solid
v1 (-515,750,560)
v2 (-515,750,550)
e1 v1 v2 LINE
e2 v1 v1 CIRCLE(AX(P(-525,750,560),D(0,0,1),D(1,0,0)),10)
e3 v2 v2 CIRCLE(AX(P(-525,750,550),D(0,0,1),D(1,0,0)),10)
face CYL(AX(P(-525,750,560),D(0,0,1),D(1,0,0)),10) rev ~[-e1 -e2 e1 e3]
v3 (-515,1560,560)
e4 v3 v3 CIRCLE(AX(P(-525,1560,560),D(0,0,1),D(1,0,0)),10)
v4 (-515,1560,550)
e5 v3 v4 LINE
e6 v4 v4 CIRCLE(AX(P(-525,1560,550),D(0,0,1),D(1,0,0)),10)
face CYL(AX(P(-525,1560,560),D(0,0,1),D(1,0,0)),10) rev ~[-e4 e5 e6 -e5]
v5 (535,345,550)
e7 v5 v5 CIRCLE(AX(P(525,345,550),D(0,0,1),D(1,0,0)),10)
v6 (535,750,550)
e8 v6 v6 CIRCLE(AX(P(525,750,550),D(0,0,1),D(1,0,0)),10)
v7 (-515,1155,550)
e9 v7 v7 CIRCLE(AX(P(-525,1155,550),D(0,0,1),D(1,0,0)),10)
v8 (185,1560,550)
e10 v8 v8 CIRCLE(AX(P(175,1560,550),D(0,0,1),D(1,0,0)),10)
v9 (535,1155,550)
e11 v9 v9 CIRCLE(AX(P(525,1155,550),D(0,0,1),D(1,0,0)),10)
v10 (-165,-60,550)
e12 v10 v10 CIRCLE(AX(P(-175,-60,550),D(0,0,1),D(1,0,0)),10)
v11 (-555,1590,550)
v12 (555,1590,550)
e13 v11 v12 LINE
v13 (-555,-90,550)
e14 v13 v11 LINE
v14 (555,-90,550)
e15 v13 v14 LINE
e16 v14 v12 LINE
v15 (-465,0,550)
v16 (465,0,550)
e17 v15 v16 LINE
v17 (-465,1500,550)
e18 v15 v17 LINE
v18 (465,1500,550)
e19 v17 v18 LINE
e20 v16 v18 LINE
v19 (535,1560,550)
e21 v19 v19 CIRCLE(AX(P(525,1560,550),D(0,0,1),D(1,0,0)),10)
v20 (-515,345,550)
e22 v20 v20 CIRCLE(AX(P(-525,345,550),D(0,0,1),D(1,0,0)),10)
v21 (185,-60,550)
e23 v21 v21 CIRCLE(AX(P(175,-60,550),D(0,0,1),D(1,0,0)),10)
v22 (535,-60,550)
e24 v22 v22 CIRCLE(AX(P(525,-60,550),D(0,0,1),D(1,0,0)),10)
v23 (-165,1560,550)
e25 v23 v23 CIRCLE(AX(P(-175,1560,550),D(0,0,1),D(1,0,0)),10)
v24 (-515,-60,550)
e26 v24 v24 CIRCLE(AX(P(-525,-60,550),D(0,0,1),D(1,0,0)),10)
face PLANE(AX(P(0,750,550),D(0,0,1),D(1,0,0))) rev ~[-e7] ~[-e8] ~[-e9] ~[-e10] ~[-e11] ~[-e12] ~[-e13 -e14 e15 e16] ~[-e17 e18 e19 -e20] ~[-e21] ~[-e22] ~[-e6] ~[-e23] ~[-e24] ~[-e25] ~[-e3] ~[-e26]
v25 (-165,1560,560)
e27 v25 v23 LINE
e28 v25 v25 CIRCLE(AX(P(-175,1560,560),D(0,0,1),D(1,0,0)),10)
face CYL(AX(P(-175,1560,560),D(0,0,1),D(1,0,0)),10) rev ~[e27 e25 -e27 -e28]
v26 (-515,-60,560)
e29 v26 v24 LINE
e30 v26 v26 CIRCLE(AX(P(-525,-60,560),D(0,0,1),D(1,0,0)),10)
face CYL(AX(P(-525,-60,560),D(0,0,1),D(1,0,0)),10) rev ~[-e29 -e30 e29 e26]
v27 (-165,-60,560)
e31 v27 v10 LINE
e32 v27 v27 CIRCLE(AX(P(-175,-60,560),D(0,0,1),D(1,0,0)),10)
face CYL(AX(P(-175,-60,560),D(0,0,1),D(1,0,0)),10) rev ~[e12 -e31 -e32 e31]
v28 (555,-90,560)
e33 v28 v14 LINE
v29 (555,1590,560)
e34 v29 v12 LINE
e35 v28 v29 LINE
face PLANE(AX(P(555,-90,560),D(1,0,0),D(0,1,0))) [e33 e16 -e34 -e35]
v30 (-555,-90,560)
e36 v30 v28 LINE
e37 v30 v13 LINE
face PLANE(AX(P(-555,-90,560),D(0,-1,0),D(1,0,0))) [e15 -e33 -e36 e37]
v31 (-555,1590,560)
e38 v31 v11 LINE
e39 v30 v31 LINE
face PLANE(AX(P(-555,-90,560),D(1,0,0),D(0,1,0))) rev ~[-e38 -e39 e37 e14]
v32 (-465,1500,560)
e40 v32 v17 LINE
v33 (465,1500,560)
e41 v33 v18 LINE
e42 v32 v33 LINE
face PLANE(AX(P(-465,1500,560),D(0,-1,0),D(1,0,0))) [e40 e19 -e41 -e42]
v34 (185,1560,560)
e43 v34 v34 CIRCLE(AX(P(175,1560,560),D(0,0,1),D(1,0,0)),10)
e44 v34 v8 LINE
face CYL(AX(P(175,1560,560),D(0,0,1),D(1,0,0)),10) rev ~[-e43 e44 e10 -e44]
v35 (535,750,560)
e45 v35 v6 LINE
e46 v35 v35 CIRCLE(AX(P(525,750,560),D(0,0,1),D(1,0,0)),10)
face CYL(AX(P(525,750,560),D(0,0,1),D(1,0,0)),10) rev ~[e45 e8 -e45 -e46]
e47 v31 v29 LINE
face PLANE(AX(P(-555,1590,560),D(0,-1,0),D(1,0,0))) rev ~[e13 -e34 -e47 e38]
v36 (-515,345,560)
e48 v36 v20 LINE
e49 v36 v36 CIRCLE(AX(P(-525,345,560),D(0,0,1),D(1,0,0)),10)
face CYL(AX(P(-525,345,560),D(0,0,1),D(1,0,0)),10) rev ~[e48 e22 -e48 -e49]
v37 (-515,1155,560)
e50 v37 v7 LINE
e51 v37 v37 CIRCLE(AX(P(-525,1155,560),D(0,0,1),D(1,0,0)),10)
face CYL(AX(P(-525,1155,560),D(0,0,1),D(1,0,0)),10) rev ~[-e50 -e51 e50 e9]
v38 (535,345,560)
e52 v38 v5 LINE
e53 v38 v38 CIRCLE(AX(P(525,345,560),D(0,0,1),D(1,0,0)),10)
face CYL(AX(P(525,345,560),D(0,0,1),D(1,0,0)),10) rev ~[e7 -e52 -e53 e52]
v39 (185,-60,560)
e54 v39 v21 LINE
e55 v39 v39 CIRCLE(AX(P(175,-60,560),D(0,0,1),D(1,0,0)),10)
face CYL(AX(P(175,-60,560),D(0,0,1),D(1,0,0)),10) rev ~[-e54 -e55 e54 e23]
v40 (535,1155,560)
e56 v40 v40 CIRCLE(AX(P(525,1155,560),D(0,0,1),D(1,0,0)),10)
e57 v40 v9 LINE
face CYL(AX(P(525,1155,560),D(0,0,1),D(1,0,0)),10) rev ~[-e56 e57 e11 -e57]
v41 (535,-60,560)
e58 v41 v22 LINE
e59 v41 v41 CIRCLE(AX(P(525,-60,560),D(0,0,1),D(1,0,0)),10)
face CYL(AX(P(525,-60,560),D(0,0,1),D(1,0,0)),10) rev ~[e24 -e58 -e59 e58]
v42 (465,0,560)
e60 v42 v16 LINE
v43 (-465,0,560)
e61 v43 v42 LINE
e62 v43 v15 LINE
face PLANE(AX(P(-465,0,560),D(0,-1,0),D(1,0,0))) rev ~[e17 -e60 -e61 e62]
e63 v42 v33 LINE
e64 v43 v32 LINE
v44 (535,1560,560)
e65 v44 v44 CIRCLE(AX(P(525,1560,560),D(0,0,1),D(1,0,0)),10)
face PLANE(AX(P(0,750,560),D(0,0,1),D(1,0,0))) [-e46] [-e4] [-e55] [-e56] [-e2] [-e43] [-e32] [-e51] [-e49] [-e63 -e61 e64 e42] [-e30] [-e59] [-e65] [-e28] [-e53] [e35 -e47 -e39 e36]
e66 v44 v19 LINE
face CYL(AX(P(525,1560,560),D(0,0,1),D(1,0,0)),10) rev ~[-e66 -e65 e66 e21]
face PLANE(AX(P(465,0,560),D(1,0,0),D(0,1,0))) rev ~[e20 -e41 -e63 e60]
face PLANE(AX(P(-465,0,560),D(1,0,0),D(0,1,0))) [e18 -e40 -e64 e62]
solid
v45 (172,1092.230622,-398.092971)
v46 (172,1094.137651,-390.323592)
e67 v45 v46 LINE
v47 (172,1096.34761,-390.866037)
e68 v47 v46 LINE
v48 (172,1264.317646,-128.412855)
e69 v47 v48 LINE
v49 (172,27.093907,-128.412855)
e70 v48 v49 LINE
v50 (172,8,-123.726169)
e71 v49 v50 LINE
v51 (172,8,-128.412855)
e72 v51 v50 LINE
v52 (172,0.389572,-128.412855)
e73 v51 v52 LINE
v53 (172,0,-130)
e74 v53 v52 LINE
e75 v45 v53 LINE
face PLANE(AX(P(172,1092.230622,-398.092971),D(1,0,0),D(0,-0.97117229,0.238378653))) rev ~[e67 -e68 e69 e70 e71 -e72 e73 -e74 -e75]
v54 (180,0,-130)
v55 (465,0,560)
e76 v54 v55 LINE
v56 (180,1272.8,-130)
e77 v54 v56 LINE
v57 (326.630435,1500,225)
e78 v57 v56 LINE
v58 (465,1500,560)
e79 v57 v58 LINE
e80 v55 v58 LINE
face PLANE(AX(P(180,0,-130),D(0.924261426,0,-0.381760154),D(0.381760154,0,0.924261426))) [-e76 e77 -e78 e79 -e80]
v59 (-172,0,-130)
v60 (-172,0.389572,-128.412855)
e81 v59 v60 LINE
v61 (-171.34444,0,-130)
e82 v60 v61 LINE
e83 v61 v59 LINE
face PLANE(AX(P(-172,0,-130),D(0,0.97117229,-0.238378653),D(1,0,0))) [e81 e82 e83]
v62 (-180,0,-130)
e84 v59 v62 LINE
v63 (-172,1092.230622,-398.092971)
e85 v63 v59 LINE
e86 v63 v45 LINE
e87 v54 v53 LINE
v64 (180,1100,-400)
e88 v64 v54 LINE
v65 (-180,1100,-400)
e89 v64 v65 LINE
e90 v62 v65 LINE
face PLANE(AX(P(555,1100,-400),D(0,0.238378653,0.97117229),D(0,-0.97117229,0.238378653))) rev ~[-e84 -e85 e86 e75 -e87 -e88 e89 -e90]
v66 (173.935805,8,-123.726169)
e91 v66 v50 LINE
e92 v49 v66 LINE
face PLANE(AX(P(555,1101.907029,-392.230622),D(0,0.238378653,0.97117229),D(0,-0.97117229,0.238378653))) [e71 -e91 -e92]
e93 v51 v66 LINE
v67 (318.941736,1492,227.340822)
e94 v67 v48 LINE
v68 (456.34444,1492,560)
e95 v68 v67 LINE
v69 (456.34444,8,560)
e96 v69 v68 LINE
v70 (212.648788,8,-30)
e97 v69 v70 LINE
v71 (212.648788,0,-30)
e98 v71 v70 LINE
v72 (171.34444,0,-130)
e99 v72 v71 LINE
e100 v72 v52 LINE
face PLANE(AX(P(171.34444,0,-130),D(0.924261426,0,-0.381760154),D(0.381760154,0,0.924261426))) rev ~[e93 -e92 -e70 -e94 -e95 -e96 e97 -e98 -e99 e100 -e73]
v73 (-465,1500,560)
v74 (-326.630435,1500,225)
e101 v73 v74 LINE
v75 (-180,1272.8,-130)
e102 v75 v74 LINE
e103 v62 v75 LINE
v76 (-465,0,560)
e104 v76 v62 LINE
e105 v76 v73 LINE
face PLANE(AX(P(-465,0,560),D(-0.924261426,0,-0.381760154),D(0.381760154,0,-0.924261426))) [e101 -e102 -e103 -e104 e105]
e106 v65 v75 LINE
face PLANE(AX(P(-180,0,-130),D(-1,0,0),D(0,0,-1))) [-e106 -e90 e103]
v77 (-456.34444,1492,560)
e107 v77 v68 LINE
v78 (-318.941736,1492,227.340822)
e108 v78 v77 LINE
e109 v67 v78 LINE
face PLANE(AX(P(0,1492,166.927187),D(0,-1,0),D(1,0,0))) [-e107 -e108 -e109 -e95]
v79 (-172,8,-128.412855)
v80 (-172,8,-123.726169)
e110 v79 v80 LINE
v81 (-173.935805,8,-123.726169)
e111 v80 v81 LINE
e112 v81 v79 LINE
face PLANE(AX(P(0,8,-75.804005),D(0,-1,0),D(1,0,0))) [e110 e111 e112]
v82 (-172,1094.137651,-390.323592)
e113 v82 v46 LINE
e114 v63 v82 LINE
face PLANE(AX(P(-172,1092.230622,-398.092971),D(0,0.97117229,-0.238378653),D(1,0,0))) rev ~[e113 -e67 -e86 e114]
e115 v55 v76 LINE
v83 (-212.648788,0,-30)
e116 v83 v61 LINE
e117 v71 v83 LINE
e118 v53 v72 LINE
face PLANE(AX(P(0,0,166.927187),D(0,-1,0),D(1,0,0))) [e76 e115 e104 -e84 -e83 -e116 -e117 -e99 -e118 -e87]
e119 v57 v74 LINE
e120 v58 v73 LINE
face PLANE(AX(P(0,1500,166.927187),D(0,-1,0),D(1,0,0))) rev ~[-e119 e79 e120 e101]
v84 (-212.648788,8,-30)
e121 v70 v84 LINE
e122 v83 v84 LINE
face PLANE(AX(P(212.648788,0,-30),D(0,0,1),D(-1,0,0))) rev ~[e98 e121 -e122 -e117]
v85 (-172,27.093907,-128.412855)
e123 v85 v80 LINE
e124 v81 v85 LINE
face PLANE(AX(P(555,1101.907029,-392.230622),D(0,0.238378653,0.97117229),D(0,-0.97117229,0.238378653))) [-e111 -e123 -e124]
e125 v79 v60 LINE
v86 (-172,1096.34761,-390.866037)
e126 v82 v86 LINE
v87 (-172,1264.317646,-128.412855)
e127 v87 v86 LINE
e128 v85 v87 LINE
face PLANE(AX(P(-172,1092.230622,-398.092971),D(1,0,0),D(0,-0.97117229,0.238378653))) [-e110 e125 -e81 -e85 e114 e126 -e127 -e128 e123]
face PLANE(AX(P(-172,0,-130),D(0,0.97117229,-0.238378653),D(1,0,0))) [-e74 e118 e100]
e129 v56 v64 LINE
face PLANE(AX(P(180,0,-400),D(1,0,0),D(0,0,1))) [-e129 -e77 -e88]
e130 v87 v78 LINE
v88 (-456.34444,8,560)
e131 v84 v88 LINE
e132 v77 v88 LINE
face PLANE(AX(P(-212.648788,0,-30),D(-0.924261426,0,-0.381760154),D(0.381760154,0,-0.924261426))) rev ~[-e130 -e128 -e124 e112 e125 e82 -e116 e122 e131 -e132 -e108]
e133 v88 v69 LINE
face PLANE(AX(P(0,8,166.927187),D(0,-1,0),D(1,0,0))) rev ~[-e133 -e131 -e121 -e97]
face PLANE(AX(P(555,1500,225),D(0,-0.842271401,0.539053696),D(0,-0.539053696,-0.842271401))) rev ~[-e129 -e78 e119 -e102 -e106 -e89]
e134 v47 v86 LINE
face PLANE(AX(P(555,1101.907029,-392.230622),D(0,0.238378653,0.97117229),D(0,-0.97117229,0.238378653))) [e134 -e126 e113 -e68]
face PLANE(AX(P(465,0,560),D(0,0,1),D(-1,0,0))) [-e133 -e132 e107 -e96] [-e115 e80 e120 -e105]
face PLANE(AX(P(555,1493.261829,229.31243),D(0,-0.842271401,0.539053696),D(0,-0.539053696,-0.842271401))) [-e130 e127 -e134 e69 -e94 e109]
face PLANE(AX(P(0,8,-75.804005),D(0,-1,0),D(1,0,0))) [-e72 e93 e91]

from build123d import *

# Parameters (mm, degrees)
F1_DEPTH  = 1500
F2_W      = 1110
F2_H      = 1680
F2_W_2    = 930
F2_H_2    = 1500
F3_DEPTH  = 10
F4_R      = 10
F5_DEPTH  = 10
F7_DEPTH  = 1110.001
F8_T      = -8
F10_DEPTH = 8
F11_W     = 344
F11_H     = 1124.6517558367
F12_DEPTH = 8


with BuildPart() as f1:
    # F0 (on Front) → F1 (new body)
    with BuildSketch(Plane.XZ):
        Polygon((465, 560), (-465, 560), (-180, -130), (-180, -400), (180, -400), (180, -130), align=None)
    extrude(amount=-F1_DEPTH)

    # F6 (on face) → F7 (cut, through all)
    with BuildSketch(Plane.YZ.offset(555)):
        Polygon((0, -400), (1100, -400), (0, -130), align=None)
        Polygon((1500, 225), (1100, -400), (1500, -400), align=None)
    extrude(amount=-F7_DEPTH, mode=Mode.SUBTRACT)

    # F8
    f8_openings = [f1.faces().sort_by_distance(p)[0] for p in [
        (0, 750, 560),
    ]]
    offset(amount=F8_T, openings=f8_openings, kind=Kind.INTERSECTION)

    # F9 (on Front) → F10 (cut)
    with BuildSketch(Plane.XZ):
        Polygon((212.6487880778, -30), (-212.6487880778, -30), (-171.3444402517, -130), (171.3444402517, -130), align=None)
    extrude(amount=-F10_DEPTH, mode=Mode.SUBTRACT)

    # F11 (on face) → F12 (cut)
    with BuildSketch(Plane(origin=(0, -30.0958765297, -122.6128303063), x_dir=(1, 0, 0), z_dir=(0, -0.2383786531, -0.9711722905))):
        with Locations((0, -593.3151028228)):
            Rectangle(F11_W, F11_H)
    extrude(amount=-F12_DEPTH, mode=Mode.SUBTRACT)


with BuildPart() as f3:
    # F2 (on face) → F3 (new body)
    with BuildSketch(Plane.XY.offset(560)):
        with Locations((0, 750)):
            Rectangle(F2_W, F2_H)
        with Locations((0, 750)):
            Rectangle(F2_W_2, F2_H_2, mode=Mode.SUBTRACT)
    extrude(amount=-F3_DEPTH)

    # F4 (on face) → F5 (cut)
    with BuildSketch(Plane.XY.offset(560)):
        with Locations((-525, 1560)):
            Circle(F4_R)
        with Locations((-175, 1560)):
            Circle(F4_R)
        with Locations((175, 1560)):
            Circle(F4_R)
        with Locations((525, 1560)):
            Circle(F4_R)
        with Locations((525, 1155)):
            Circle(F4_R)
        with Locations((525, 750)):
            Circle(F4_R)
        with Locations((525, 345)):
            Circle(F4_R)
        with Locations((525, -60)):
            Circle(F4_R)
        with Locations((-525, 1155)):
            Circle(F4_R)
        with Locations((-525, 750)):
            Circle(F4_R)
        with Locations((-525, 345)):
            Circle(F4_R)
        with Locations((-525, -60)):
            Circle(F4_R)
        with Locations((175, -60)):
            Circle(F4_R)
        with Locations((-175, -60)):
            Circle(F4_R)
    extrude(amount=-F5_DEPTH, mode=Mode.SUBTRACT)


solid = Compound([f1.part, f3.part])
